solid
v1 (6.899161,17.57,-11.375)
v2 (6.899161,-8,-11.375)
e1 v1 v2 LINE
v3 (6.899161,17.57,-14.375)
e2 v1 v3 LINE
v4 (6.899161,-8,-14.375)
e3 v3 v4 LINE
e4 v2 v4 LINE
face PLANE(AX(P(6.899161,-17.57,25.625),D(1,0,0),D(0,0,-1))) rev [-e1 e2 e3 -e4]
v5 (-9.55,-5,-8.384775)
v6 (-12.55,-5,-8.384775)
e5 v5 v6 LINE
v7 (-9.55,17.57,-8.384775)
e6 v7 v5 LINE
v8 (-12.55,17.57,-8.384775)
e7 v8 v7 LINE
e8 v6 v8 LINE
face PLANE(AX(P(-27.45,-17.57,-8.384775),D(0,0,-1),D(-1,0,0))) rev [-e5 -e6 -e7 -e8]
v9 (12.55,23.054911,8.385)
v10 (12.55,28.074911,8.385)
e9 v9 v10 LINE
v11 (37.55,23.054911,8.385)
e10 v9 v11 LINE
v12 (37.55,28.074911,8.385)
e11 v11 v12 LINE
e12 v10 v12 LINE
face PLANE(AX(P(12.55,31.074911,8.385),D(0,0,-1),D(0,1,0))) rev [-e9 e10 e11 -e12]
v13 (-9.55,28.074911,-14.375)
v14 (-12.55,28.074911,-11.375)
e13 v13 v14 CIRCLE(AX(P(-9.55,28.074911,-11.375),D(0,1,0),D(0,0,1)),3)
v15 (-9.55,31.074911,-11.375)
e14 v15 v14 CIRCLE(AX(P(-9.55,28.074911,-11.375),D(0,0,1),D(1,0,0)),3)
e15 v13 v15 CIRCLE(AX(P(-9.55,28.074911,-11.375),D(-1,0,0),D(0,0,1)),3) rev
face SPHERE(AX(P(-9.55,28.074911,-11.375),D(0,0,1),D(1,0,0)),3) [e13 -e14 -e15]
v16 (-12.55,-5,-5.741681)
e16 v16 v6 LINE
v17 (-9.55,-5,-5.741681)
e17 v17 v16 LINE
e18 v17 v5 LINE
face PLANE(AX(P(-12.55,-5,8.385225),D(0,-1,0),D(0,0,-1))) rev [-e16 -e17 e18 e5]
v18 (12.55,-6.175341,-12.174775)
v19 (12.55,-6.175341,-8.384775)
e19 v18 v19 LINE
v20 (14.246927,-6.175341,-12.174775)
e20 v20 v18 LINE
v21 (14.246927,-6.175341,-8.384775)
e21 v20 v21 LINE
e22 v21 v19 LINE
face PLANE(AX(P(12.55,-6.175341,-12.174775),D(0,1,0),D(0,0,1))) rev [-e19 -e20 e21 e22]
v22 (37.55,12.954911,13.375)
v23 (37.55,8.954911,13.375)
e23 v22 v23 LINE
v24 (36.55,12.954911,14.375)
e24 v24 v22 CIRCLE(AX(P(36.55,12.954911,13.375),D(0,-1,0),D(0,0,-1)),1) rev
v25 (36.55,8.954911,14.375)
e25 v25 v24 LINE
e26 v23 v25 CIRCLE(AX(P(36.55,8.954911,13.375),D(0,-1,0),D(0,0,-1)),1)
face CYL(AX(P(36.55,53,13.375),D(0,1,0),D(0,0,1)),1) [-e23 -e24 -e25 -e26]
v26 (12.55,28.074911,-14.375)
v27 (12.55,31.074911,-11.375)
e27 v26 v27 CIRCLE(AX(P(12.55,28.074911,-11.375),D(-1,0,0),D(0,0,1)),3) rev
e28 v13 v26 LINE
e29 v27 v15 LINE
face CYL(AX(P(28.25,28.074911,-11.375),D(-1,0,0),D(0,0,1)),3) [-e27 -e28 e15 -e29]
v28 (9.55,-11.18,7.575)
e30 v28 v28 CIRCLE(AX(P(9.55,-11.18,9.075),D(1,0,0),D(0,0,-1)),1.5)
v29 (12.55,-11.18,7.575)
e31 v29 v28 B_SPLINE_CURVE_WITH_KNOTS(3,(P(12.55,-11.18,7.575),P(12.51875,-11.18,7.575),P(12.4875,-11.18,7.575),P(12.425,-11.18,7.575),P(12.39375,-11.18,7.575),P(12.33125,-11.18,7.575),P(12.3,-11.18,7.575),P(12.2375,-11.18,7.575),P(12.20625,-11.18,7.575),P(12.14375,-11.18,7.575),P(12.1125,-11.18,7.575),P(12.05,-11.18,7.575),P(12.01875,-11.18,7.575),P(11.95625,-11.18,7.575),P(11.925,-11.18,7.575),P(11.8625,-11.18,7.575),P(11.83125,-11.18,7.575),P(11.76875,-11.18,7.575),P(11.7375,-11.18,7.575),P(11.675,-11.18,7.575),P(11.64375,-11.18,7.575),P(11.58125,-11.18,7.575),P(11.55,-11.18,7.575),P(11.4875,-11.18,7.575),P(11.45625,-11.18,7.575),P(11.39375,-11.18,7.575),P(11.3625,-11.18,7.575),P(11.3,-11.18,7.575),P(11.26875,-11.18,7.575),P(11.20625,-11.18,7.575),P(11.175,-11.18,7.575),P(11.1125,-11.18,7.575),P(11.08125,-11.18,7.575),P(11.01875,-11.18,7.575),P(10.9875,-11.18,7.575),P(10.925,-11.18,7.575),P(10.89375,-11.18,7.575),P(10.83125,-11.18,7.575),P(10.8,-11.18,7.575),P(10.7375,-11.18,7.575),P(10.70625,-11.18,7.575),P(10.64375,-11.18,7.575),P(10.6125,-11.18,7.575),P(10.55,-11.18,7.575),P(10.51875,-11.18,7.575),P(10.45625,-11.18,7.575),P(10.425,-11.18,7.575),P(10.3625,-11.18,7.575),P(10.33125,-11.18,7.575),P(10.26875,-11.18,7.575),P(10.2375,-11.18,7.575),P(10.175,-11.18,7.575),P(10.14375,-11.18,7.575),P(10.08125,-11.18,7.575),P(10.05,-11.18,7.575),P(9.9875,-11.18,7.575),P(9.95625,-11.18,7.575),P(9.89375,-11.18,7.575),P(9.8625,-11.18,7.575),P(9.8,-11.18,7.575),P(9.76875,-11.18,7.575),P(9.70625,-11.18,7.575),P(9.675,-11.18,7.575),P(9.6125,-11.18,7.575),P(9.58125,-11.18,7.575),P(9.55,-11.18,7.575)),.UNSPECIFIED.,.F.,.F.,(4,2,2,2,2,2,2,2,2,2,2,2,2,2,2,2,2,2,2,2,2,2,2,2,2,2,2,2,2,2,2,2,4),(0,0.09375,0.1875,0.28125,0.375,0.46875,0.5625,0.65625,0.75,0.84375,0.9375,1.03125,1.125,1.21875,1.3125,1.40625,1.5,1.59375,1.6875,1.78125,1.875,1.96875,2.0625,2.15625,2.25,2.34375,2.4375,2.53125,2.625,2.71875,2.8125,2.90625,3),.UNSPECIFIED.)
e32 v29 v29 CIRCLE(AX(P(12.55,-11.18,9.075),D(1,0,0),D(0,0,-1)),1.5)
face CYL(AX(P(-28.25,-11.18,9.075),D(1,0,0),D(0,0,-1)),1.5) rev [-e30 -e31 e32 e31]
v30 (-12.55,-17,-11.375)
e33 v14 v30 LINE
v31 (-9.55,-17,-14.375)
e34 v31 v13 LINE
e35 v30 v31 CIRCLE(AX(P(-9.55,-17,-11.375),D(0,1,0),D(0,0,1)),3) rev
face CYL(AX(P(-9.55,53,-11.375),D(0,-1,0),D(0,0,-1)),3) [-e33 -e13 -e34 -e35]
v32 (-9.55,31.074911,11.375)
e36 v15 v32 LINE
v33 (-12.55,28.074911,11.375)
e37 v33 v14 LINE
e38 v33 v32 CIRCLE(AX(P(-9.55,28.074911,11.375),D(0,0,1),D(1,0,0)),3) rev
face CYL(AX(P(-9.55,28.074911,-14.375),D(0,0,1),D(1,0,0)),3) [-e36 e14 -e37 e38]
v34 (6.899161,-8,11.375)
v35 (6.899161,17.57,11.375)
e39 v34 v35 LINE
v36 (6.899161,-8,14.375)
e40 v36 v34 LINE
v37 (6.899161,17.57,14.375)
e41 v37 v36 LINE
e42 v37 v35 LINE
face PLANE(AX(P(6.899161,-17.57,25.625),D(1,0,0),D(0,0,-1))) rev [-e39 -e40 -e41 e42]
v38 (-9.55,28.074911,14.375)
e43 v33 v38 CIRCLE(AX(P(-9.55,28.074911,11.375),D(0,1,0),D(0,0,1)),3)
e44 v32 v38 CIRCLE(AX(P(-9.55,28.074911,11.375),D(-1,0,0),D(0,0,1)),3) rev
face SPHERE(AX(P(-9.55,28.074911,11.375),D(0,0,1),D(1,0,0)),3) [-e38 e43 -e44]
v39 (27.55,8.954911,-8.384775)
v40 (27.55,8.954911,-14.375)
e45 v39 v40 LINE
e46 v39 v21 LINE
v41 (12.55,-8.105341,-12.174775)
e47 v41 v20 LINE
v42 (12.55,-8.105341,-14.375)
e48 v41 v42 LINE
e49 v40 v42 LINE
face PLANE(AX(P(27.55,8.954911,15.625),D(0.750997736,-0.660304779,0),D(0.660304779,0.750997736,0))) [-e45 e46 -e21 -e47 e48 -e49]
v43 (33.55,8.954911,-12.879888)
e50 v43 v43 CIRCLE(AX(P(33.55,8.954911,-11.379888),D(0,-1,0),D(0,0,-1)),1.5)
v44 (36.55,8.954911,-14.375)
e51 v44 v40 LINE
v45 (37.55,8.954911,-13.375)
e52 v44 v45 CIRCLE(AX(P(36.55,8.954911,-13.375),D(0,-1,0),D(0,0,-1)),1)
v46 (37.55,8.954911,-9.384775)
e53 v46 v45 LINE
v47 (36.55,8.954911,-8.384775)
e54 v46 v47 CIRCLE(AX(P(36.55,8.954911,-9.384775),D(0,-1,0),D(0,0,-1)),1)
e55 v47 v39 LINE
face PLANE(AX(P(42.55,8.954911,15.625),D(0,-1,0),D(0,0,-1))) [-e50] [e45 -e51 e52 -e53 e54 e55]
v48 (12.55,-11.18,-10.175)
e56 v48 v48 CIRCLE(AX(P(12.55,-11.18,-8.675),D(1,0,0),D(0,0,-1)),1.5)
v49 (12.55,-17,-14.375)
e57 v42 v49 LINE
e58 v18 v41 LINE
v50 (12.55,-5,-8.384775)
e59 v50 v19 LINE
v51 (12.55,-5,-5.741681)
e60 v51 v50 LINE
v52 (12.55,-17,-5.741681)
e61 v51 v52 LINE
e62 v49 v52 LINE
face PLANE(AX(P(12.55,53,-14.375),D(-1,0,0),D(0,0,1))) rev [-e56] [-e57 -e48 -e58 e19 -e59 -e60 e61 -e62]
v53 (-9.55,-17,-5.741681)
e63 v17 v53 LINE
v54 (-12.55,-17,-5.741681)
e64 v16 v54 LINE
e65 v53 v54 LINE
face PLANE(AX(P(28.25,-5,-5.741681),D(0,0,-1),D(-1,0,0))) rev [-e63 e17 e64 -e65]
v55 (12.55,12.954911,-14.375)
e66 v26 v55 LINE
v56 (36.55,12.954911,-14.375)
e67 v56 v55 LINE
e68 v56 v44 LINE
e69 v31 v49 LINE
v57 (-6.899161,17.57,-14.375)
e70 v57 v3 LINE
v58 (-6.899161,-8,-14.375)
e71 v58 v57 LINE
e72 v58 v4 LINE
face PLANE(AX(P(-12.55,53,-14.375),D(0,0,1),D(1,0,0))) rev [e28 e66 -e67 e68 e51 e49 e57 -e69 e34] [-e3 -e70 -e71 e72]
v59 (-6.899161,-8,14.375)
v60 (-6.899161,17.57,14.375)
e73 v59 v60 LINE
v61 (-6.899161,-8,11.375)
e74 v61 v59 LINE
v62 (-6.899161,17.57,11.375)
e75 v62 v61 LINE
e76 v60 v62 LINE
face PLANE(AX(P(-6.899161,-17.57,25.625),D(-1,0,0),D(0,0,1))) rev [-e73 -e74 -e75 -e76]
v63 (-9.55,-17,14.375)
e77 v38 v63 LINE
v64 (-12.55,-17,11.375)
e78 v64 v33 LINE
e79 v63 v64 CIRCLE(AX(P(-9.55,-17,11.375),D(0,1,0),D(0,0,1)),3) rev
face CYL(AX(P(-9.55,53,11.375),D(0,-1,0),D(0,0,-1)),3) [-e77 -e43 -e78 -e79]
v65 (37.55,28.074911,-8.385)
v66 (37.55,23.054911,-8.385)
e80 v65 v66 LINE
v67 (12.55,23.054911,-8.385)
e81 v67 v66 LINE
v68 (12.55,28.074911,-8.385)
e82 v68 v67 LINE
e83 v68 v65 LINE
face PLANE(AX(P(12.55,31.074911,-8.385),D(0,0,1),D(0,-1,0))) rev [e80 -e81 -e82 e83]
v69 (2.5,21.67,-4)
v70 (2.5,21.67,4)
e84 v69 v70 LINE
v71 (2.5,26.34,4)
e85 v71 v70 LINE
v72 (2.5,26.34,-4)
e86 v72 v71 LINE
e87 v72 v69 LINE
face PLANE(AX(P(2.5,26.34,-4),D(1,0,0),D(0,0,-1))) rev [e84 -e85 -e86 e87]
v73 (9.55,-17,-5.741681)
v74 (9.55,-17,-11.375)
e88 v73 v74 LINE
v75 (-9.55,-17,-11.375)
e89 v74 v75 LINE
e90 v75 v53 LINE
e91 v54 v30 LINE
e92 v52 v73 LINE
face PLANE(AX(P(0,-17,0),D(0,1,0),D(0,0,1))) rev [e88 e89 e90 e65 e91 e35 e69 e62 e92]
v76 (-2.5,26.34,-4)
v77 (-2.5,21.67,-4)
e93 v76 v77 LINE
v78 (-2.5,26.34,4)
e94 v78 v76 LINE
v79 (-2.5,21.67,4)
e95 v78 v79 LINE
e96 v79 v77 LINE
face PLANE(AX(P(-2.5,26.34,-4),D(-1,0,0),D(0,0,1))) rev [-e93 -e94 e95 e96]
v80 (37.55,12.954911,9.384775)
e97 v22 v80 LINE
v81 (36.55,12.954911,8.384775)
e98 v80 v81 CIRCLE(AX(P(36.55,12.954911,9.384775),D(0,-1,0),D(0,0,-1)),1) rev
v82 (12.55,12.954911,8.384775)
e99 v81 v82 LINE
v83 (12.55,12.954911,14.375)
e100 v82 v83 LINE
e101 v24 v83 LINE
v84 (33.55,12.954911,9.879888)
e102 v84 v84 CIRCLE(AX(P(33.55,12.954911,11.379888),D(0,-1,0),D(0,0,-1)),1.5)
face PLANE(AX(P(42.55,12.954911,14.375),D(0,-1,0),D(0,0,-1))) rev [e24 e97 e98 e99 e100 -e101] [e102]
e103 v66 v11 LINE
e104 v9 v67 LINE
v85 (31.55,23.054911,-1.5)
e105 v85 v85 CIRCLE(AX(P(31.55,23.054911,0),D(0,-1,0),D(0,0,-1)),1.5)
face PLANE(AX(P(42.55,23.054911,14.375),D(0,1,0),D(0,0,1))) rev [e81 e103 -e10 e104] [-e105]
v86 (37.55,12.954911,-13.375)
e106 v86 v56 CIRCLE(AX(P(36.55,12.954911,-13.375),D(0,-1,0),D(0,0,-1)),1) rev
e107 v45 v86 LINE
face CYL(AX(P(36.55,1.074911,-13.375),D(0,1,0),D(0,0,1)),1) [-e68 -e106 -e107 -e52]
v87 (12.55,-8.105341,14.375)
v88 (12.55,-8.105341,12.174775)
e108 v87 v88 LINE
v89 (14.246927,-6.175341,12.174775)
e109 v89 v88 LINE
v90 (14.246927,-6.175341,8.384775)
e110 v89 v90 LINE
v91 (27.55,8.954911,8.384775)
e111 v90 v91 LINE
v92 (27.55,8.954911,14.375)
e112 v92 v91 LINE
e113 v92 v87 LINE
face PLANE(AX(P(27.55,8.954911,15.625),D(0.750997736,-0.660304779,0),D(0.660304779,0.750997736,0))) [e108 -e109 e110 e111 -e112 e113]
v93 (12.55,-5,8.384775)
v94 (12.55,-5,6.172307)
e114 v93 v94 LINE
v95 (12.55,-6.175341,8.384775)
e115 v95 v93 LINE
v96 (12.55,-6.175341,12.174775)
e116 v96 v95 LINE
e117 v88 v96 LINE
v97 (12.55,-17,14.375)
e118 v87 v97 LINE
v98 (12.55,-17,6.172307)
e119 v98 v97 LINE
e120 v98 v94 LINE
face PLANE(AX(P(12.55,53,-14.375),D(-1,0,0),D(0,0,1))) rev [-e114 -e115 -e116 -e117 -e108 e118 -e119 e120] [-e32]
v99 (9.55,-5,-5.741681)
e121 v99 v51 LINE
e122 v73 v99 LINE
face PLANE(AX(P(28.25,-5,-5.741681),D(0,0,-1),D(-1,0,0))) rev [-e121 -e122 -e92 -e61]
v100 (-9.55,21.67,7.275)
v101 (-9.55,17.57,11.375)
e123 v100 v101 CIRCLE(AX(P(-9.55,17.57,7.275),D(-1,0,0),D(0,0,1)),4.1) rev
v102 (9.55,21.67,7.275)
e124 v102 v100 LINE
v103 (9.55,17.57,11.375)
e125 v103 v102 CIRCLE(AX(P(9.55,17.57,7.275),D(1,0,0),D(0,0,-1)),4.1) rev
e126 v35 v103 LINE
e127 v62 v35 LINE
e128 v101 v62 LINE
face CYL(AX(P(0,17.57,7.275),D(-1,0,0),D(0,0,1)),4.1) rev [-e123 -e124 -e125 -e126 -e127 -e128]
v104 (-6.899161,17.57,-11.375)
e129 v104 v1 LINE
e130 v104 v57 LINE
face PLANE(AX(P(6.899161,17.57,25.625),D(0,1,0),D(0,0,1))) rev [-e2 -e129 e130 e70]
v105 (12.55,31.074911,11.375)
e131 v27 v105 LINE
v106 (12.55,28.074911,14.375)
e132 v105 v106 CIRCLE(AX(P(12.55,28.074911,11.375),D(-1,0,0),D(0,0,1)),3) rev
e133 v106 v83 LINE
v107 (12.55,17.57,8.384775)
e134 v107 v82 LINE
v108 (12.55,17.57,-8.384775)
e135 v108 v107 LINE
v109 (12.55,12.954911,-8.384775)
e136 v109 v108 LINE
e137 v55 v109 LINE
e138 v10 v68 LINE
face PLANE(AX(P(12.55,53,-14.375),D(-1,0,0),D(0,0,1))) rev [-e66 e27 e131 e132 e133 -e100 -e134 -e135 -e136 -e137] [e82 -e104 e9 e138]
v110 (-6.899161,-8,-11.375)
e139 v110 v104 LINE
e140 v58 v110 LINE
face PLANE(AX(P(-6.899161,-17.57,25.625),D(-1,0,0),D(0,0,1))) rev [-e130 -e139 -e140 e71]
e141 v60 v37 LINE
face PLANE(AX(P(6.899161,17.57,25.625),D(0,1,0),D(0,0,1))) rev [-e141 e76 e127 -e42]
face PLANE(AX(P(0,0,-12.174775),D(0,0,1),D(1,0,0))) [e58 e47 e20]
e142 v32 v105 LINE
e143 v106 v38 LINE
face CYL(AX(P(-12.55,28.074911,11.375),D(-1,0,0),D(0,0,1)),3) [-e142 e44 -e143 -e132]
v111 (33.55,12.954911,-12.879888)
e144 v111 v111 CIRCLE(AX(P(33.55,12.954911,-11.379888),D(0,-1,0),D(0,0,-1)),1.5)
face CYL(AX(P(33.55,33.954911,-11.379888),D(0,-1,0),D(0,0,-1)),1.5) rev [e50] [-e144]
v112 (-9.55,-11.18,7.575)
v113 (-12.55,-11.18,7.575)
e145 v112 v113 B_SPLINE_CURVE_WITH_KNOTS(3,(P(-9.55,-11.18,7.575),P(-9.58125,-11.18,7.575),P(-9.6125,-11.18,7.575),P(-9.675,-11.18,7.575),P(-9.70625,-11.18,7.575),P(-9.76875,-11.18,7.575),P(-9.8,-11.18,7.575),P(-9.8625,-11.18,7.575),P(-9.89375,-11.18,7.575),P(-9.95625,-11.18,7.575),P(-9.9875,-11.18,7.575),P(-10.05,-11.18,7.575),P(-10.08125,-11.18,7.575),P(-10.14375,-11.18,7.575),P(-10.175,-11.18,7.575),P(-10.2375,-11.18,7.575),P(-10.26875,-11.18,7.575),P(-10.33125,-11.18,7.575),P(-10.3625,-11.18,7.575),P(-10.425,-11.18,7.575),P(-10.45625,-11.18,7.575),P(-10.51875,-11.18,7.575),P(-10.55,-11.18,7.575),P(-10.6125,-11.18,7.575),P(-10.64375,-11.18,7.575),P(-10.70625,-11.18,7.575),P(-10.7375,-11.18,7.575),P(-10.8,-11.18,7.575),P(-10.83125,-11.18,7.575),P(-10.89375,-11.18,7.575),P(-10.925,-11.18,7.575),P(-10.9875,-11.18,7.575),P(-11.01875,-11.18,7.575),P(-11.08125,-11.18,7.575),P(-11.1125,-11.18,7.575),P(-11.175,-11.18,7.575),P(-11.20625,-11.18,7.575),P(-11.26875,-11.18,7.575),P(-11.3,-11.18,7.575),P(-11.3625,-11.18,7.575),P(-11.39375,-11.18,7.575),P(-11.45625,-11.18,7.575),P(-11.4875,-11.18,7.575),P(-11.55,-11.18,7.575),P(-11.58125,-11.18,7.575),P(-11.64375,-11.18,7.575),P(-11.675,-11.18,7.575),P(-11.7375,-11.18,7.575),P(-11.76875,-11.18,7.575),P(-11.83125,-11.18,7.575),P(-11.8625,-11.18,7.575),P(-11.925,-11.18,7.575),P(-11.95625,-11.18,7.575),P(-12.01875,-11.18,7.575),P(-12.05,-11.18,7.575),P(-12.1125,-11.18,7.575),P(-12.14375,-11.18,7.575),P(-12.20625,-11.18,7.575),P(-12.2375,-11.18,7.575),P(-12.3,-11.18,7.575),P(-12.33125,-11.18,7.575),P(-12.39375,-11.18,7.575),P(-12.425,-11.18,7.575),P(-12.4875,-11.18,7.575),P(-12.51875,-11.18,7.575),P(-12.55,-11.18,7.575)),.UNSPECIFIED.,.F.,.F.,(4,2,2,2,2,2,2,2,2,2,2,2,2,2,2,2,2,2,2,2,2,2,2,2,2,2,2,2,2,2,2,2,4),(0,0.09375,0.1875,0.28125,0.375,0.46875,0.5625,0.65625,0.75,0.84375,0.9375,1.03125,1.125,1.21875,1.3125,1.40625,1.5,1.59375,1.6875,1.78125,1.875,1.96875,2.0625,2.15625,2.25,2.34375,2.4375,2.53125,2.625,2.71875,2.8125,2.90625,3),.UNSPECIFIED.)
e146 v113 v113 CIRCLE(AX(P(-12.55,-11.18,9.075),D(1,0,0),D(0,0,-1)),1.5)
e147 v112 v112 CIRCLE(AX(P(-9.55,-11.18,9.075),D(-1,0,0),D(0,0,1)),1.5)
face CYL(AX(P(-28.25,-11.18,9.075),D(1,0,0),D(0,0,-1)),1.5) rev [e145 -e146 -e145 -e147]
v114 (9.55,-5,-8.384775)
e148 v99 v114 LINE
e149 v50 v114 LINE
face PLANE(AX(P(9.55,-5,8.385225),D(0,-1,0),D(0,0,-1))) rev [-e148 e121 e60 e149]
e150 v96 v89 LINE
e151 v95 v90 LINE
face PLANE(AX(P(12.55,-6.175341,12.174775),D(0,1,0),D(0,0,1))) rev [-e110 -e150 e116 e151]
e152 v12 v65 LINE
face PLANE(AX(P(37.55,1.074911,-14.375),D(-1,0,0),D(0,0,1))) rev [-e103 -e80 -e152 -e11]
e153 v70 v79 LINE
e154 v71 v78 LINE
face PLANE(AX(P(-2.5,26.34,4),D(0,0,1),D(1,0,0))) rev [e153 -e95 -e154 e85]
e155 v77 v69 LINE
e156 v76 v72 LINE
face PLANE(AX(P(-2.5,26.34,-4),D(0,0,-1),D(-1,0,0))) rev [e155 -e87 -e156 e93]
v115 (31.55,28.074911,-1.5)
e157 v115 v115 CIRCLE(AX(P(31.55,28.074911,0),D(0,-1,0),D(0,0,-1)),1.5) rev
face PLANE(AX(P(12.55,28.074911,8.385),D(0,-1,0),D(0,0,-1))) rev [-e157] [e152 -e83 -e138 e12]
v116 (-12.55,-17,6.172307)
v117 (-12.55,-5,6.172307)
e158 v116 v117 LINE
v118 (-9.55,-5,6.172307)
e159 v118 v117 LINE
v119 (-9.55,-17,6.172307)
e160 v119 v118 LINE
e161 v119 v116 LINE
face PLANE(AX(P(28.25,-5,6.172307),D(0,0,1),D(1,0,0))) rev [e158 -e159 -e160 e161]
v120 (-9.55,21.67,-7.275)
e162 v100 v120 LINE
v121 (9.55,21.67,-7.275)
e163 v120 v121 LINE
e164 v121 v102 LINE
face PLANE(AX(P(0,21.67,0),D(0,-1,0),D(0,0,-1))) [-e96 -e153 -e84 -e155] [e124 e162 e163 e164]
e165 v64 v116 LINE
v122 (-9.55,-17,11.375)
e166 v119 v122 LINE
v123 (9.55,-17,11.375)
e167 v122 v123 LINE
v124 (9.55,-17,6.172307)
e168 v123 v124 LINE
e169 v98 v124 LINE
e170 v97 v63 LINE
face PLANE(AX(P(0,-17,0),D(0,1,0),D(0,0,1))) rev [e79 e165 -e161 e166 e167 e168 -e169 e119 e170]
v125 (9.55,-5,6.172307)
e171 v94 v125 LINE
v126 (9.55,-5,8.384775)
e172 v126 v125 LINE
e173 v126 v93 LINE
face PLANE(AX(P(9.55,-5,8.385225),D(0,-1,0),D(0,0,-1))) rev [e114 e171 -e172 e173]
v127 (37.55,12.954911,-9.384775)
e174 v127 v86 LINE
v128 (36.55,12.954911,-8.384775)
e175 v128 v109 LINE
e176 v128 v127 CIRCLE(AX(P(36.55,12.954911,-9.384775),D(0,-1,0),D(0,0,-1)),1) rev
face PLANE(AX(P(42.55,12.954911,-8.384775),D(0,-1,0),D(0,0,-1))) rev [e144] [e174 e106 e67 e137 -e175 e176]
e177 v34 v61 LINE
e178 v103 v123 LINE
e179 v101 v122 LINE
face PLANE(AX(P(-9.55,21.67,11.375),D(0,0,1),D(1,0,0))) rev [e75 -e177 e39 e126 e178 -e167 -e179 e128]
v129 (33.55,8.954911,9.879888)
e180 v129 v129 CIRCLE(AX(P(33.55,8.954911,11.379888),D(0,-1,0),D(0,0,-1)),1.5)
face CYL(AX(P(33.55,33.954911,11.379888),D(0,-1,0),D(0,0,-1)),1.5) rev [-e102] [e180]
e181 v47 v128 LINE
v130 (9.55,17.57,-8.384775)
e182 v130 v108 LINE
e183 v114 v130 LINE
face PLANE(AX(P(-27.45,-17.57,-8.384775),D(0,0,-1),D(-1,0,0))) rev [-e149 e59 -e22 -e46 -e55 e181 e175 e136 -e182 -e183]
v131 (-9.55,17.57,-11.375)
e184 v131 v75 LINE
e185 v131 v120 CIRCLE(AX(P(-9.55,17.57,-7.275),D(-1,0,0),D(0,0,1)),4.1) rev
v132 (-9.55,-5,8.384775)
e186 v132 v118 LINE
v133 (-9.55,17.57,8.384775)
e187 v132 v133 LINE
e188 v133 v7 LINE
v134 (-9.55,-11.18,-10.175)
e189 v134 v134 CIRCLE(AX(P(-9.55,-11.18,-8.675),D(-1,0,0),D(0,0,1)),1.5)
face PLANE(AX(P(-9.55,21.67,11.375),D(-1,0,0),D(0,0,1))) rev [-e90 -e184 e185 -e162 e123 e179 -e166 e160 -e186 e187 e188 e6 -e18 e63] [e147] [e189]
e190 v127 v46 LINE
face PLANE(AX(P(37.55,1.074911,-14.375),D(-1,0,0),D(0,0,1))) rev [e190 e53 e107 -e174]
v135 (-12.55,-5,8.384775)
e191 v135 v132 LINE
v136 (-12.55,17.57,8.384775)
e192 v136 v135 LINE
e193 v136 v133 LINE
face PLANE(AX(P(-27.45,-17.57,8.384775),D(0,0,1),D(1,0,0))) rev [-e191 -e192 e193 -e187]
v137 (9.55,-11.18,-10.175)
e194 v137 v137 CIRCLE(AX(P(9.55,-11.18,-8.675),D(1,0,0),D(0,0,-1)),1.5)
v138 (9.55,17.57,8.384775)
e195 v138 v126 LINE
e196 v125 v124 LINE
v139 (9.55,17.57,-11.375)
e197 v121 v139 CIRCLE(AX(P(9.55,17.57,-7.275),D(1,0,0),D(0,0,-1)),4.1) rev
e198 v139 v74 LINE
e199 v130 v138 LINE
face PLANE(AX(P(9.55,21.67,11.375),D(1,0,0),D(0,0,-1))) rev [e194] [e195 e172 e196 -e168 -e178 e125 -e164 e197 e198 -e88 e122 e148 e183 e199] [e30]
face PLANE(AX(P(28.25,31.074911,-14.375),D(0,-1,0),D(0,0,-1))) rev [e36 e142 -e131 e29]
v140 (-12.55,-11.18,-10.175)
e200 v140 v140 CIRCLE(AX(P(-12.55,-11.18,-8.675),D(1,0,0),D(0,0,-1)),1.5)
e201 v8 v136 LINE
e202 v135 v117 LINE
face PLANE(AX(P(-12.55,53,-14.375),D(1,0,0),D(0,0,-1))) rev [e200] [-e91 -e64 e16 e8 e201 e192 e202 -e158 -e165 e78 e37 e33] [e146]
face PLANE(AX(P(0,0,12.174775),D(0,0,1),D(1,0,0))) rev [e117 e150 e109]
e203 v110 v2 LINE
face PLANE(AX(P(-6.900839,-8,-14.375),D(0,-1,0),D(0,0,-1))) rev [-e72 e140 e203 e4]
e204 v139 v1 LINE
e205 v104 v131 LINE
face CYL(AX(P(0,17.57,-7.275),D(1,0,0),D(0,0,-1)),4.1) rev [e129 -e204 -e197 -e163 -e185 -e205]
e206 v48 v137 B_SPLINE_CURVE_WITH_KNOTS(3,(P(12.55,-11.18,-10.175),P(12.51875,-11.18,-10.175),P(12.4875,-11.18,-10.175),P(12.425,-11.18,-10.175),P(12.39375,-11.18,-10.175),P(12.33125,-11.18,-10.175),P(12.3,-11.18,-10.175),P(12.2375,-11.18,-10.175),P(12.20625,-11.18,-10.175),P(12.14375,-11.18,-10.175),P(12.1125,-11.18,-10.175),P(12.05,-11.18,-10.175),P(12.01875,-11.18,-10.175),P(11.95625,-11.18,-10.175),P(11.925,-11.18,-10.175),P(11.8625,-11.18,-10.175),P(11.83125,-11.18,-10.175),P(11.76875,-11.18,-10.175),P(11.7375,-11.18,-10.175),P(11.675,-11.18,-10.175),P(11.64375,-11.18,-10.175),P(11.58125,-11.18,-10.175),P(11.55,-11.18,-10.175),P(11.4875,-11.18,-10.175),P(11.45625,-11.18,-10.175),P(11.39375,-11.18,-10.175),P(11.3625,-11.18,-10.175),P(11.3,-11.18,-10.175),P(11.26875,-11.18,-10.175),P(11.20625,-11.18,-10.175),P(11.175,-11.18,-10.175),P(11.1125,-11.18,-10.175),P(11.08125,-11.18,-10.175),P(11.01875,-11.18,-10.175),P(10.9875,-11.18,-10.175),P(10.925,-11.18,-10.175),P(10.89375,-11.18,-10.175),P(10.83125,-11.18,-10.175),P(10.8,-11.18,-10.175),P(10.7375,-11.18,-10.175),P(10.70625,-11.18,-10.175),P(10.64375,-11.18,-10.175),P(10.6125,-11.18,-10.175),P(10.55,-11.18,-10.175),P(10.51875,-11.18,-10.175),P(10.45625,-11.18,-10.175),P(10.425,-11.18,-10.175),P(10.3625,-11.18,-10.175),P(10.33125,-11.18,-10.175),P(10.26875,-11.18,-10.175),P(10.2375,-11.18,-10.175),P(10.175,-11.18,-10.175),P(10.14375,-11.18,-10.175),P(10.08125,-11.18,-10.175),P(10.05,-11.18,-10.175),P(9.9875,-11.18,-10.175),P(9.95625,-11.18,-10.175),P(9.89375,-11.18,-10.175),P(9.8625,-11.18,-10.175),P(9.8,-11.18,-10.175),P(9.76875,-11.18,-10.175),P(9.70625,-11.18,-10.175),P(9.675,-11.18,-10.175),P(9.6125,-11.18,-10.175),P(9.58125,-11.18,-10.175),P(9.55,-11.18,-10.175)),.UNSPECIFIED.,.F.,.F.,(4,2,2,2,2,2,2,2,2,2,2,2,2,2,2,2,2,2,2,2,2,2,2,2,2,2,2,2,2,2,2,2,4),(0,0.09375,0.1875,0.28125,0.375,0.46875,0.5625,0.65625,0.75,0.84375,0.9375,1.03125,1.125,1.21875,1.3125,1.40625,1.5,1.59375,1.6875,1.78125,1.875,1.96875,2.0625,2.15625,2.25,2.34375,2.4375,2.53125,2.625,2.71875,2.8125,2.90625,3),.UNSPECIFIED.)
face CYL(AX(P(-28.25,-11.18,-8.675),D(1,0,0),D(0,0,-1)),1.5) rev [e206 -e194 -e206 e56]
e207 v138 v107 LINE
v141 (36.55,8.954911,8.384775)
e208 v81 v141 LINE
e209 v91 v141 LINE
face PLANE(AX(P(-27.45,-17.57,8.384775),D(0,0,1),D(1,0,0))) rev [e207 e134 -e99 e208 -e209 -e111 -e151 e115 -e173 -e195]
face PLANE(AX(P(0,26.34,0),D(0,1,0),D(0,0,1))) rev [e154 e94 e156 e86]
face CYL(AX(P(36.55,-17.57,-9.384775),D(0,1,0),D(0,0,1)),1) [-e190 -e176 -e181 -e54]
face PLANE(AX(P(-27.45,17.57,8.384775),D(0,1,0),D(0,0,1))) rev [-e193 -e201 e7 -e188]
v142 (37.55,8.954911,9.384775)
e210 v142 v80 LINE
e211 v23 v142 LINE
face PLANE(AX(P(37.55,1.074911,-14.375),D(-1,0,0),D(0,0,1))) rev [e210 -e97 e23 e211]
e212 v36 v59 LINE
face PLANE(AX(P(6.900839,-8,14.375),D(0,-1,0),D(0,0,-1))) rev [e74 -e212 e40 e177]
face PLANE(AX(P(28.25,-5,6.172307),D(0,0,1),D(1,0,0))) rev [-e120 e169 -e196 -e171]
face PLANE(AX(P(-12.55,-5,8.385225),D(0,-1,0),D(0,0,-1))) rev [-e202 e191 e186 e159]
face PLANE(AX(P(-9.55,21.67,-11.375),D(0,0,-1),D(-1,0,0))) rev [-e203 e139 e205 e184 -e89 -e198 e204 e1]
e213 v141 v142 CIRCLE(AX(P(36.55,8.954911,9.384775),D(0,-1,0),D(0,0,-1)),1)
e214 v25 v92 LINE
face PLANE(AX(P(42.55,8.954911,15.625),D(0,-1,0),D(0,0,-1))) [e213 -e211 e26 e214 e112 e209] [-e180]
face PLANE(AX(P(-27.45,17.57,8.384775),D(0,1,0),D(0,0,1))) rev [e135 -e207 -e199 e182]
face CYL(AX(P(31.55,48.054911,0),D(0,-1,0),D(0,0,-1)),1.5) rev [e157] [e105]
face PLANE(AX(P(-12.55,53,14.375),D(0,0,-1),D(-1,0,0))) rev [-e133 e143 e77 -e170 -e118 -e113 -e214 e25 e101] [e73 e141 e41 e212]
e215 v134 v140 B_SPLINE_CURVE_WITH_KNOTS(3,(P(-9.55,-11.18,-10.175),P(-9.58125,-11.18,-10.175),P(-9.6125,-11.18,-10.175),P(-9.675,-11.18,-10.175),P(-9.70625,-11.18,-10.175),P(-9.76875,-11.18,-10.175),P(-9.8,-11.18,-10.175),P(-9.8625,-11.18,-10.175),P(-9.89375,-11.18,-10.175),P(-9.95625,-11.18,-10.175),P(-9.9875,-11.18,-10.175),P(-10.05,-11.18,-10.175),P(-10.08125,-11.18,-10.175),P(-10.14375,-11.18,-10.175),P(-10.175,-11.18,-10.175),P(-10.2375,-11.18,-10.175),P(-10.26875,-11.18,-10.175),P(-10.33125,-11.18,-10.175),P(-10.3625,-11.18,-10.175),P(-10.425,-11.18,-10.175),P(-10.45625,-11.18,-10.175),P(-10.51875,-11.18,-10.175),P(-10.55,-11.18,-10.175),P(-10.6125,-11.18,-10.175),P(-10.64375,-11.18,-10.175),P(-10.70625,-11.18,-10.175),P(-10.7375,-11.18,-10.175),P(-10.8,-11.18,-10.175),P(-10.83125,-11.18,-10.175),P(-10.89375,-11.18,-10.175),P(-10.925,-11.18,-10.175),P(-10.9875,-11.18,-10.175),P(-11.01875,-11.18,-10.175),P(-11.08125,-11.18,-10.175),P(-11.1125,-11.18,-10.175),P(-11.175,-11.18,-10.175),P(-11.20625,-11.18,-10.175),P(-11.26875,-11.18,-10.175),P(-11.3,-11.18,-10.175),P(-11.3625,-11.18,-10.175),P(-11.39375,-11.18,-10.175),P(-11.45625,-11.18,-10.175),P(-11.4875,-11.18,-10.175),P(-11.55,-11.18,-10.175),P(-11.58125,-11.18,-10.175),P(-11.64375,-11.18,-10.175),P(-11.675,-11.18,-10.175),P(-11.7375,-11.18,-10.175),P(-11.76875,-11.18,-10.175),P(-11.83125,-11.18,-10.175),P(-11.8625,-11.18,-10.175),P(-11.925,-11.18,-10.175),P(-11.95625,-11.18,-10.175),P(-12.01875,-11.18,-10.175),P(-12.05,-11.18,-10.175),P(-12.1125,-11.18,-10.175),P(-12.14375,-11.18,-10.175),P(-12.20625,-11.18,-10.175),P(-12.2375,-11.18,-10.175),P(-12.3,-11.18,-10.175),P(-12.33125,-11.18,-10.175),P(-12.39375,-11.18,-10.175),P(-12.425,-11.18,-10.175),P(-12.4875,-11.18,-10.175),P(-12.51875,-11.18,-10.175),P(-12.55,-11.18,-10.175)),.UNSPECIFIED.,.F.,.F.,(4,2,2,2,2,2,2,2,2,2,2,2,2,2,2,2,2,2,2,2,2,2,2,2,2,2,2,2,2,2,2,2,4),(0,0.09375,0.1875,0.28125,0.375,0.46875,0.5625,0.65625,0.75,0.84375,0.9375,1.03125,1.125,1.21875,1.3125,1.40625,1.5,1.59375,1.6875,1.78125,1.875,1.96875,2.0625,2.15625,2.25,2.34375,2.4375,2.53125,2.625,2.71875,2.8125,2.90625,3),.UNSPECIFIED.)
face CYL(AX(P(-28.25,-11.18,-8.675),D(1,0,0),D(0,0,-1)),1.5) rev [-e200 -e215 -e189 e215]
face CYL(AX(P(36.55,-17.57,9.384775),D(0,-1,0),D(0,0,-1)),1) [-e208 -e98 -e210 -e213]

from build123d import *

# Parameters (mm, degrees)
SKETCH4_W            = 25.1
SKETCH4_H            = 28.75
BOSS_EXTRUDE2_DEPTH  = 53
SKETCH5_W            = 19.1
SKETCH5_H            = 22.75
CUT_EXTRUDE1_DEPTH   = 21.67
FILLET1_R            = 4.1
SKETCH6_W            = 5
SKETCH6_H            = 8
CUT_EXTRUDE2_DEPTH   = 4.67
SKETCH7_W            = 16.769550268
SKETCH7_H            = 35.14
CUT_EXTRUDE3_DEPTH   = 40
SKETCH8_W            = 13.798322684
SKETCH8_H            = 35.14
CUT_EXTRUDE4_DEPTH   = 40
BOSS_EXTRUDE3_DEPTH  = 17
SKETCH10_W           = 3
SKETCH10_H           = 9
BOSS_EXTRUDE4_DEPTH  = 13.8
SKETCH11_W           = 3
SKETCH11_H           = 9
BOSS_EXTRUDE5_DEPTH  = 13.8
SKETCH12_W           = 3
SKETCH12_H           = 12
BOSS_EXTRUDE6_DEPTH  = 16.77
SKETCH24_R           = 1.5
CUT_EXTRUDE6_DEPTH   = 40.8
SKETCH25_W           = 28.75
SKETCH25_H           = 21.925089144
CUT_EXTRUDE7_DEPTH   = 40.8
SKETCH26_W           = 11.913987102
SKETCH26_H           = 12
CUT_EXTRUDE8_DEPTH   = 40.8
SKETCH30_W           = 28.75
SKETCH30_H           = 8.02
BOSS_EXTRUDE10_DEPTH = 30
SKETCH32_W           = 5.990224866
SKETCH32_H           = 21.060252184
BOSS_EXTRUDE13_DEPTH = 30
CUT_EXTRUDE9_DEPTH   = 30
SKETCH36_W           = 5
SKETCH36_H           = 28.75
CUT_EXTRUDE10_DEPTH  = 30
SKETCH38_W           = 5.99
SKETCH38_H           = 8.02
CUT_EXTRUDE11_DEPTH  = 25
SKETCH39_R           = 1.5
CUT_EXTRUDE12_DEPTH  = 25
SKETCH40_R           = 1.5
CUT_EXTRUDE13_DEPTH  = 25
FILLET4_R            = 3
FILLET5_R            = 3
FILLET7_R            = 1
SKETCH41_W           = 16.77
SKETCH41_H           = 3
CUT_EXTRUDE14_DEPTH  = 25
CUT_EXTRUDE15_DEPTH  = 3.79
CUT_EXTRUDE16_DEPTH  = 3.79


with BuildPart() as part:
    # Sketch4 → Boss-Extrude2 (new body)
    with BuildSketch(Plane(origin=(0, 0, 0), x_dir=(1, 0, 0), z_dir=(0, 1, 0))):
        Rectangle(SKETCH4_W, SKETCH4_H)
    extrude(amount=BOSS_EXTRUDE2_DEPTH)

    # Sketch5 → Cut-Extrude1 (cut)
    with BuildSketch(Plane(origin=(0, 0, 0), x_dir=(-1, 0, 0), z_dir=(0, -1, 0))):
        Rectangle(SKETCH5_W, SKETCH5_H)
    extrude(amount=-CUT_EXTRUDE1_DEPTH, mode=Mode.SUBTRACT)

    # Fillet1
    fillet1_edges = [part.edges().sort_by_distance(p)[0] for p in [
        (0, 21.67, -11.375),
        (0, 21.67, 11.375),
    ]]
    fillet(fillet1_edges, radius=FILLET1_R)

    # Sketch6 → Cut-Extrude2 (cut)
    with BuildSketch(Plane(origin=(0, 21.67, 0), x_dir=(-1, 0, 0), z_dir=(0, -1, 0))):
        Rectangle(SKETCH6_W, SKETCH6_H)
    extrude(amount=-CUT_EXTRUDE2_DEPTH, mode=Mode.SUBTRACT)

    # Sketch7 → Cut-Extrude3 (cut)
    with BuildSketch(Plane(origin=(12.55, 0, 0), x_dir=(0, 0, -1), z_dir=(1, 0, 0))):
        Rectangle(SKETCH7_W, SKETCH7_H)
    extrude(amount=-CUT_EXTRUDE3_DEPTH, mode=Mode.SUBTRACT)

    # Sketch8 → Cut-Extrude4 (cut)
    with BuildSketch(Plane(origin=(0, 0, -14.375), x_dir=(-1, 0, 0), z_dir=(0, 0, -1))):
        Rectangle(SKETCH8_W, SKETCH8_H)
    extrude(amount=-CUT_EXTRUDE4_DEPTH, mode=Mode.SUBTRACT)

    # Sketch9 → Boss-Extrude3 (add)
    with BuildSketch(Plane.XZ):
        Polygon((-9.55, 8.384775134), (-12.55, 8.384775134), (-12.55, 14.375), (-6.899161342, 14.375), (-6.899161342, 11.375), (-9.55, 11.375), align=None)
        Polygon((-9.55, -8.384775134), (-12.55, -8.384775134), (-12.55, -14.375), (-6.899161342, -14.375), (-6.899161342, -11.375), (-9.55, -11.375), align=None)
        Polygon((6.899161342, -11.375), (6.899161342, -14.375), (12.55, -14.375), (12.55, -8.384775134), (9.55, -8.384775134), (9.55, -11.375), align=None)
        Polygon((9.55, 8.384775134), (12.55, 8.384775134), (12.55, 14.375), (6.899161342, 14.375), (6.899161342, 11.375), (9.55, 11.375), align=None)
    extrude(amount=BOSS_EXTRUDE3_DEPTH)

    # Sketch10 → Boss-Extrude4 (add)
    with BuildSketch(Plane(origin=(-6.899161342, 0, 0), x_dir=(0, 0, -1), z_dir=(1, 0, 0))):
        with Locations((-12.875, -12.5)):
            Rectangle(SKETCH10_W, SKETCH10_H)
    extrude(amount=BOSS_EXTRUDE4_DEPTH)

    # Sketch11 → Boss-Extrude5 (add)
    with BuildSketch(Plane.ZY.offset(-6.899161342)):
        with Locations((-12.875, -12.5)):
            Rectangle(SKETCH11_W, SKETCH11_H)
    extrude(amount=BOSS_EXTRUDE5_DEPTH)

    # Sketch12 → Boss-Extrude6 (add)
    with BuildSketch(Plane.XY.offset(-8.384775134)):
        with Locations((-11.05, -11)):
            Rectangle(SKETCH12_W, SKETCH12_H)
        with Locations((11.05, -11)):
            Rectangle(SKETCH12_W, SKETCH12_H)
    extrude(amount=BOSS_EXTRUDE6_DEPTH)

    # Sketch24 → Cut-Extrude6 (cut)
    with BuildSketch(Plane(origin=(12.55, 0, 0), x_dir=(0, 0, -1), z_dir=(1, 0, 0))):
        with Locations((8.675, -11.18)):
            Circle(SKETCH24_R)
        with Locations((-9.075, -11.18)):
            Circle(SKETCH24_R)
    extrude(amount=-CUT_EXTRUDE6_DEPTH, mode=Mode.SUBTRACT)

    # Sketch25 → Cut-Extrude7 (cut)
    with BuildSketch(Plane.ZY.offset(12.55)):
        with Locations((0, 42.037455428)):
            Rectangle(SKETCH25_W, SKETCH25_H)
    extrude(amount=-CUT_EXTRUDE7_DEPTH, mode=Mode.SUBTRACT)

    # Sketch26 → Cut-Extrude8 (cut)
    with BuildSketch(Plane.ZY.offset(12.55)):
        with Locations((0.21531302, -11)):
            Rectangle(SKETCH26_W, SKETCH26_H)
    extrude(amount=-CUT_EXTRUDE8_DEPTH, mode=Mode.SUBTRACT)

    # Sketch30 → Boss-Extrude10 (add)
    with BuildSketch(Plane(origin=(12.55, 0, 0), x_dir=(0, 0, -1), z_dir=(1, 0, 0))):
        with Locations((0, 27.064910856)):
            Rectangle(SKETCH30_W, SKETCH30_H)
    extrude(amount=BOSS_EXTRUDE10_DEPTH)

    # Sketch32 → Boss-Extrude13 (add)
    with BuildSketch(Plane(origin=(12.55, 0, 0), x_dir=(0, 0, -1), z_dir=(1, 0, 0))):
        with Locations((-11.379887567, 2.424784764)):
            Rectangle(SKETCH32_W, SKETCH32_H)
        with Locations((11.379887567, 2.424784764)):
            Rectangle(SKETCH32_W, SKETCH32_H)
    extrude(amount=BOSS_EXTRUDE13_DEPTH)

    # Sketch35 → Cut-Extrude9 (cut)
    with BuildSketch(Plane(origin=(0, 0, -14.375), x_dir=(-1, 0, 0), z_dir=(0, 0, -1))):
        Polygon((-42.55, 8.954910856), (-27.55, 8.954910856), (-12.55, -8.105341328), (-42.55, -8.105341328), align=None)
    extrude(amount=-CUT_EXTRUDE9_DEPTH, mode=Mode.SUBTRACT)

    # Sketch36 → Cut-Extrude10 (cut)
    with BuildSketch(Plane(origin=(0, 31.074910856, 0), x_dir=(1, 0, 0), z_dir=(0, 1, 0))):
        with Locations((40.05, 0)):
            Rectangle(SKETCH36_W, SKETCH36_H)
    extrude(amount=-CUT_EXTRUDE10_DEPTH, mode=Mode.SUBTRACT)

    # Sketch38 → Cut-Extrude11 (cut)
    with BuildSketch(Plane(origin=(37.55, 0, 0), x_dir=(0, 0, -1), z_dir=(1, 0, 0))):
        with Locations((-11.38, 27.064910856)):
            Rectangle(SKETCH38_W, SKETCH38_H)
        with Locations((11.38, 27.064910856)):
            Rectangle(SKETCH38_W, SKETCH38_H)
    extrude(amount=-CUT_EXTRUDE11_DEPTH, mode=Mode.SUBTRACT)

    # Sketch39 → Cut-Extrude12 (cut)
    with BuildSketch(Plane(origin=(0, 8.954910856, 0), x_dir=(-1, 0, 0), z_dir=(0, -1, 0))):
        with Locations(Location((-33.55, 11.379887567, 0), (0, 0, 90))):
            Circle(SKETCH39_R)
        with Locations(Location((-33.55, -11.379887567, 0), (0, 0, 90))):
            Circle(SKETCH39_R)
    extrude(amount=-CUT_EXTRUDE12_DEPTH, mode=Mode.SUBTRACT)

    # Sketch40 → Cut-Extrude13 (cut)
    with BuildSketch(Plane.XZ.offset(-23.054910856)):
        with Locations(Location((31.55, 0, 0), (0, 0, 270))):
            Circle(SKETCH40_R)
    extrude(amount=-CUT_EXTRUDE13_DEPTH, mode=Mode.SUBTRACT)

    # Fillet4
    fillet4_edges = [part.edges().sort_by_distance(p)[0] for p in [
        (-12.55, 31.074910856, 0),
        (0, 31.074910856, 14.375),
        (0, 31.074910856, -14.375),
    ]]
    fillet(fillet4_edges, radius=FILLET4_R)

    # Fillet5
    # the kernel refuses this fillet: 3 mm, written as the material it takes off along each edge
    with BuildSketch(Plane(origin=(-9.55, 28.074910856, 11.375), x_dir=(0, 0, 1), z_dir=(-1, 0, 0))) as fillet5_piece_1_section:
        Polygon((0, 0), (FILLET5_R, 0), (FILLET5_R, FILLET5_R), (0, FILLET5_R), align=None)
    fillet5_piece_1 = extrude(amount=FILLET5_R, mode=Mode.PRIVATE)
    fillet5_piece_1 = fillet5_piece_1 - Plane(origin=(-9.55, 28.074910856, 11.375), x_dir=(0, -0.7071067811865475, -0.7071067811865475), z_dir=(-1, 0, 0)) * Sphere(FILLET5_R, mode=Mode.PRIVATE)
    add(fillet5_piece_1, mode=Mode.SUBTRACT)
    with BuildSketch(Plane(origin=(-9.55, 28.074910856, -11.375), x_dir=(-1, 0, 0), z_dir=(0, 0, -1))) as fillet5_piece_2_section:
        Polygon((0, 0), (FILLET5_R, 0), (FILLET5_R, FILLET5_R), (0, FILLET5_R), align=None)
    fillet5_piece_2 = extrude(amount=FILLET5_R, mode=Mode.PRIVATE)
    fillet5_piece_2 = fillet5_piece_2 - Plane(origin=(-9.55, 28.074910856, -11.375), x_dir=(0.7071067811865475, -0.7071067811865475, 0), z_dir=(0, 0, -1)) * Sphere(FILLET5_R, mode=Mode.PRIVATE)
    add(fillet5_piece_2, mode=Mode.SUBTRACT)
    with BuildSketch(Plane(origin=(-12.55, 28.074910856, -14.375), x_dir=(1, 0, 0), z_dir=(0, -1, 0))) as fillet5_piece_3:
        with BuildLine():
            CenterArc((FILLET5_R, FILLET5_R), FILLET5_R, 180, 90)
            Line((0, FILLET5_R), (0, 0))
            Line((0, 0), (FILLET5_R, 0))
        make_face()
    extrude(amount=52.574910856, mode=Mode.SUBTRACT)
    with BuildSketch(Plane(origin=(-12.55, -24.5, 14.375), x_dir=(0, 0, -1), z_dir=(0, 1, 0))) as fillet5_piece_4:
        with BuildLine():
            CenterArc((FILLET5_R, -FILLET5_R), FILLET5_R, 90, 90)
            Line((0, -FILLET5_R), (0, 0))
            Line((0, 0), (FILLET5_R, 0))
        make_face()
    extrude(amount=52.574910856, mode=Mode.SUBTRACT)

    # Fillet7
    fillet7_edges = [part.edges().sort_by_distance(p)[0] for p in [
        (37.55, 10.954910856, -14.375),
        (37.55, 10.954910856, -8.384775134),
        (37.55, 10.954910856, 14.375),
        (37.55, 10.954910856, 8.384775134),
    ]]
    fillet(fillet7_edges, radius=FILLET7_R)

    # Sketch41 → Cut-Extrude14 (cut)
    with BuildSketch(Plane(origin=(37.55, 0, 0), x_dir=(0, 0, -1), z_dir=(1, 0, 0))):
        with Locations((0, 29.574910856)):
            Rectangle(SKETCH41_W, SKETCH41_H)
    extrude(amount=-CUT_EXTRUDE14_DEPTH, mode=Mode.SUBTRACT)

    # Sketch43 → Cut-Extrude15 (cut)
    with BuildSketch(Plane(origin=(0, 0, 8.384775134), x_dir=(-1, 0, 0), z_dir=(0, 0, -1))):
        Polygon((-12.55, -8.105341328), (-12.55, -6.175341328), (-14.24692685, -6.175341328), align=None)
    extrude(amount=-CUT_EXTRUDE15_DEPTH, mode=Mode.SUBTRACT)

    # Sketch44 → Cut-Extrude16 (cut)
    with BuildSketch(Plane.XY.offset(-8.384775134)):
        Polygon((12.55, -8.105341328), (12.55, -6.175341328), (14.24692685, -6.175341328), align=None)
    extrude(amount=-CUT_EXTRUDE16_DEPTH, mode=Mode.SUBTRACT)


solid = part.part
